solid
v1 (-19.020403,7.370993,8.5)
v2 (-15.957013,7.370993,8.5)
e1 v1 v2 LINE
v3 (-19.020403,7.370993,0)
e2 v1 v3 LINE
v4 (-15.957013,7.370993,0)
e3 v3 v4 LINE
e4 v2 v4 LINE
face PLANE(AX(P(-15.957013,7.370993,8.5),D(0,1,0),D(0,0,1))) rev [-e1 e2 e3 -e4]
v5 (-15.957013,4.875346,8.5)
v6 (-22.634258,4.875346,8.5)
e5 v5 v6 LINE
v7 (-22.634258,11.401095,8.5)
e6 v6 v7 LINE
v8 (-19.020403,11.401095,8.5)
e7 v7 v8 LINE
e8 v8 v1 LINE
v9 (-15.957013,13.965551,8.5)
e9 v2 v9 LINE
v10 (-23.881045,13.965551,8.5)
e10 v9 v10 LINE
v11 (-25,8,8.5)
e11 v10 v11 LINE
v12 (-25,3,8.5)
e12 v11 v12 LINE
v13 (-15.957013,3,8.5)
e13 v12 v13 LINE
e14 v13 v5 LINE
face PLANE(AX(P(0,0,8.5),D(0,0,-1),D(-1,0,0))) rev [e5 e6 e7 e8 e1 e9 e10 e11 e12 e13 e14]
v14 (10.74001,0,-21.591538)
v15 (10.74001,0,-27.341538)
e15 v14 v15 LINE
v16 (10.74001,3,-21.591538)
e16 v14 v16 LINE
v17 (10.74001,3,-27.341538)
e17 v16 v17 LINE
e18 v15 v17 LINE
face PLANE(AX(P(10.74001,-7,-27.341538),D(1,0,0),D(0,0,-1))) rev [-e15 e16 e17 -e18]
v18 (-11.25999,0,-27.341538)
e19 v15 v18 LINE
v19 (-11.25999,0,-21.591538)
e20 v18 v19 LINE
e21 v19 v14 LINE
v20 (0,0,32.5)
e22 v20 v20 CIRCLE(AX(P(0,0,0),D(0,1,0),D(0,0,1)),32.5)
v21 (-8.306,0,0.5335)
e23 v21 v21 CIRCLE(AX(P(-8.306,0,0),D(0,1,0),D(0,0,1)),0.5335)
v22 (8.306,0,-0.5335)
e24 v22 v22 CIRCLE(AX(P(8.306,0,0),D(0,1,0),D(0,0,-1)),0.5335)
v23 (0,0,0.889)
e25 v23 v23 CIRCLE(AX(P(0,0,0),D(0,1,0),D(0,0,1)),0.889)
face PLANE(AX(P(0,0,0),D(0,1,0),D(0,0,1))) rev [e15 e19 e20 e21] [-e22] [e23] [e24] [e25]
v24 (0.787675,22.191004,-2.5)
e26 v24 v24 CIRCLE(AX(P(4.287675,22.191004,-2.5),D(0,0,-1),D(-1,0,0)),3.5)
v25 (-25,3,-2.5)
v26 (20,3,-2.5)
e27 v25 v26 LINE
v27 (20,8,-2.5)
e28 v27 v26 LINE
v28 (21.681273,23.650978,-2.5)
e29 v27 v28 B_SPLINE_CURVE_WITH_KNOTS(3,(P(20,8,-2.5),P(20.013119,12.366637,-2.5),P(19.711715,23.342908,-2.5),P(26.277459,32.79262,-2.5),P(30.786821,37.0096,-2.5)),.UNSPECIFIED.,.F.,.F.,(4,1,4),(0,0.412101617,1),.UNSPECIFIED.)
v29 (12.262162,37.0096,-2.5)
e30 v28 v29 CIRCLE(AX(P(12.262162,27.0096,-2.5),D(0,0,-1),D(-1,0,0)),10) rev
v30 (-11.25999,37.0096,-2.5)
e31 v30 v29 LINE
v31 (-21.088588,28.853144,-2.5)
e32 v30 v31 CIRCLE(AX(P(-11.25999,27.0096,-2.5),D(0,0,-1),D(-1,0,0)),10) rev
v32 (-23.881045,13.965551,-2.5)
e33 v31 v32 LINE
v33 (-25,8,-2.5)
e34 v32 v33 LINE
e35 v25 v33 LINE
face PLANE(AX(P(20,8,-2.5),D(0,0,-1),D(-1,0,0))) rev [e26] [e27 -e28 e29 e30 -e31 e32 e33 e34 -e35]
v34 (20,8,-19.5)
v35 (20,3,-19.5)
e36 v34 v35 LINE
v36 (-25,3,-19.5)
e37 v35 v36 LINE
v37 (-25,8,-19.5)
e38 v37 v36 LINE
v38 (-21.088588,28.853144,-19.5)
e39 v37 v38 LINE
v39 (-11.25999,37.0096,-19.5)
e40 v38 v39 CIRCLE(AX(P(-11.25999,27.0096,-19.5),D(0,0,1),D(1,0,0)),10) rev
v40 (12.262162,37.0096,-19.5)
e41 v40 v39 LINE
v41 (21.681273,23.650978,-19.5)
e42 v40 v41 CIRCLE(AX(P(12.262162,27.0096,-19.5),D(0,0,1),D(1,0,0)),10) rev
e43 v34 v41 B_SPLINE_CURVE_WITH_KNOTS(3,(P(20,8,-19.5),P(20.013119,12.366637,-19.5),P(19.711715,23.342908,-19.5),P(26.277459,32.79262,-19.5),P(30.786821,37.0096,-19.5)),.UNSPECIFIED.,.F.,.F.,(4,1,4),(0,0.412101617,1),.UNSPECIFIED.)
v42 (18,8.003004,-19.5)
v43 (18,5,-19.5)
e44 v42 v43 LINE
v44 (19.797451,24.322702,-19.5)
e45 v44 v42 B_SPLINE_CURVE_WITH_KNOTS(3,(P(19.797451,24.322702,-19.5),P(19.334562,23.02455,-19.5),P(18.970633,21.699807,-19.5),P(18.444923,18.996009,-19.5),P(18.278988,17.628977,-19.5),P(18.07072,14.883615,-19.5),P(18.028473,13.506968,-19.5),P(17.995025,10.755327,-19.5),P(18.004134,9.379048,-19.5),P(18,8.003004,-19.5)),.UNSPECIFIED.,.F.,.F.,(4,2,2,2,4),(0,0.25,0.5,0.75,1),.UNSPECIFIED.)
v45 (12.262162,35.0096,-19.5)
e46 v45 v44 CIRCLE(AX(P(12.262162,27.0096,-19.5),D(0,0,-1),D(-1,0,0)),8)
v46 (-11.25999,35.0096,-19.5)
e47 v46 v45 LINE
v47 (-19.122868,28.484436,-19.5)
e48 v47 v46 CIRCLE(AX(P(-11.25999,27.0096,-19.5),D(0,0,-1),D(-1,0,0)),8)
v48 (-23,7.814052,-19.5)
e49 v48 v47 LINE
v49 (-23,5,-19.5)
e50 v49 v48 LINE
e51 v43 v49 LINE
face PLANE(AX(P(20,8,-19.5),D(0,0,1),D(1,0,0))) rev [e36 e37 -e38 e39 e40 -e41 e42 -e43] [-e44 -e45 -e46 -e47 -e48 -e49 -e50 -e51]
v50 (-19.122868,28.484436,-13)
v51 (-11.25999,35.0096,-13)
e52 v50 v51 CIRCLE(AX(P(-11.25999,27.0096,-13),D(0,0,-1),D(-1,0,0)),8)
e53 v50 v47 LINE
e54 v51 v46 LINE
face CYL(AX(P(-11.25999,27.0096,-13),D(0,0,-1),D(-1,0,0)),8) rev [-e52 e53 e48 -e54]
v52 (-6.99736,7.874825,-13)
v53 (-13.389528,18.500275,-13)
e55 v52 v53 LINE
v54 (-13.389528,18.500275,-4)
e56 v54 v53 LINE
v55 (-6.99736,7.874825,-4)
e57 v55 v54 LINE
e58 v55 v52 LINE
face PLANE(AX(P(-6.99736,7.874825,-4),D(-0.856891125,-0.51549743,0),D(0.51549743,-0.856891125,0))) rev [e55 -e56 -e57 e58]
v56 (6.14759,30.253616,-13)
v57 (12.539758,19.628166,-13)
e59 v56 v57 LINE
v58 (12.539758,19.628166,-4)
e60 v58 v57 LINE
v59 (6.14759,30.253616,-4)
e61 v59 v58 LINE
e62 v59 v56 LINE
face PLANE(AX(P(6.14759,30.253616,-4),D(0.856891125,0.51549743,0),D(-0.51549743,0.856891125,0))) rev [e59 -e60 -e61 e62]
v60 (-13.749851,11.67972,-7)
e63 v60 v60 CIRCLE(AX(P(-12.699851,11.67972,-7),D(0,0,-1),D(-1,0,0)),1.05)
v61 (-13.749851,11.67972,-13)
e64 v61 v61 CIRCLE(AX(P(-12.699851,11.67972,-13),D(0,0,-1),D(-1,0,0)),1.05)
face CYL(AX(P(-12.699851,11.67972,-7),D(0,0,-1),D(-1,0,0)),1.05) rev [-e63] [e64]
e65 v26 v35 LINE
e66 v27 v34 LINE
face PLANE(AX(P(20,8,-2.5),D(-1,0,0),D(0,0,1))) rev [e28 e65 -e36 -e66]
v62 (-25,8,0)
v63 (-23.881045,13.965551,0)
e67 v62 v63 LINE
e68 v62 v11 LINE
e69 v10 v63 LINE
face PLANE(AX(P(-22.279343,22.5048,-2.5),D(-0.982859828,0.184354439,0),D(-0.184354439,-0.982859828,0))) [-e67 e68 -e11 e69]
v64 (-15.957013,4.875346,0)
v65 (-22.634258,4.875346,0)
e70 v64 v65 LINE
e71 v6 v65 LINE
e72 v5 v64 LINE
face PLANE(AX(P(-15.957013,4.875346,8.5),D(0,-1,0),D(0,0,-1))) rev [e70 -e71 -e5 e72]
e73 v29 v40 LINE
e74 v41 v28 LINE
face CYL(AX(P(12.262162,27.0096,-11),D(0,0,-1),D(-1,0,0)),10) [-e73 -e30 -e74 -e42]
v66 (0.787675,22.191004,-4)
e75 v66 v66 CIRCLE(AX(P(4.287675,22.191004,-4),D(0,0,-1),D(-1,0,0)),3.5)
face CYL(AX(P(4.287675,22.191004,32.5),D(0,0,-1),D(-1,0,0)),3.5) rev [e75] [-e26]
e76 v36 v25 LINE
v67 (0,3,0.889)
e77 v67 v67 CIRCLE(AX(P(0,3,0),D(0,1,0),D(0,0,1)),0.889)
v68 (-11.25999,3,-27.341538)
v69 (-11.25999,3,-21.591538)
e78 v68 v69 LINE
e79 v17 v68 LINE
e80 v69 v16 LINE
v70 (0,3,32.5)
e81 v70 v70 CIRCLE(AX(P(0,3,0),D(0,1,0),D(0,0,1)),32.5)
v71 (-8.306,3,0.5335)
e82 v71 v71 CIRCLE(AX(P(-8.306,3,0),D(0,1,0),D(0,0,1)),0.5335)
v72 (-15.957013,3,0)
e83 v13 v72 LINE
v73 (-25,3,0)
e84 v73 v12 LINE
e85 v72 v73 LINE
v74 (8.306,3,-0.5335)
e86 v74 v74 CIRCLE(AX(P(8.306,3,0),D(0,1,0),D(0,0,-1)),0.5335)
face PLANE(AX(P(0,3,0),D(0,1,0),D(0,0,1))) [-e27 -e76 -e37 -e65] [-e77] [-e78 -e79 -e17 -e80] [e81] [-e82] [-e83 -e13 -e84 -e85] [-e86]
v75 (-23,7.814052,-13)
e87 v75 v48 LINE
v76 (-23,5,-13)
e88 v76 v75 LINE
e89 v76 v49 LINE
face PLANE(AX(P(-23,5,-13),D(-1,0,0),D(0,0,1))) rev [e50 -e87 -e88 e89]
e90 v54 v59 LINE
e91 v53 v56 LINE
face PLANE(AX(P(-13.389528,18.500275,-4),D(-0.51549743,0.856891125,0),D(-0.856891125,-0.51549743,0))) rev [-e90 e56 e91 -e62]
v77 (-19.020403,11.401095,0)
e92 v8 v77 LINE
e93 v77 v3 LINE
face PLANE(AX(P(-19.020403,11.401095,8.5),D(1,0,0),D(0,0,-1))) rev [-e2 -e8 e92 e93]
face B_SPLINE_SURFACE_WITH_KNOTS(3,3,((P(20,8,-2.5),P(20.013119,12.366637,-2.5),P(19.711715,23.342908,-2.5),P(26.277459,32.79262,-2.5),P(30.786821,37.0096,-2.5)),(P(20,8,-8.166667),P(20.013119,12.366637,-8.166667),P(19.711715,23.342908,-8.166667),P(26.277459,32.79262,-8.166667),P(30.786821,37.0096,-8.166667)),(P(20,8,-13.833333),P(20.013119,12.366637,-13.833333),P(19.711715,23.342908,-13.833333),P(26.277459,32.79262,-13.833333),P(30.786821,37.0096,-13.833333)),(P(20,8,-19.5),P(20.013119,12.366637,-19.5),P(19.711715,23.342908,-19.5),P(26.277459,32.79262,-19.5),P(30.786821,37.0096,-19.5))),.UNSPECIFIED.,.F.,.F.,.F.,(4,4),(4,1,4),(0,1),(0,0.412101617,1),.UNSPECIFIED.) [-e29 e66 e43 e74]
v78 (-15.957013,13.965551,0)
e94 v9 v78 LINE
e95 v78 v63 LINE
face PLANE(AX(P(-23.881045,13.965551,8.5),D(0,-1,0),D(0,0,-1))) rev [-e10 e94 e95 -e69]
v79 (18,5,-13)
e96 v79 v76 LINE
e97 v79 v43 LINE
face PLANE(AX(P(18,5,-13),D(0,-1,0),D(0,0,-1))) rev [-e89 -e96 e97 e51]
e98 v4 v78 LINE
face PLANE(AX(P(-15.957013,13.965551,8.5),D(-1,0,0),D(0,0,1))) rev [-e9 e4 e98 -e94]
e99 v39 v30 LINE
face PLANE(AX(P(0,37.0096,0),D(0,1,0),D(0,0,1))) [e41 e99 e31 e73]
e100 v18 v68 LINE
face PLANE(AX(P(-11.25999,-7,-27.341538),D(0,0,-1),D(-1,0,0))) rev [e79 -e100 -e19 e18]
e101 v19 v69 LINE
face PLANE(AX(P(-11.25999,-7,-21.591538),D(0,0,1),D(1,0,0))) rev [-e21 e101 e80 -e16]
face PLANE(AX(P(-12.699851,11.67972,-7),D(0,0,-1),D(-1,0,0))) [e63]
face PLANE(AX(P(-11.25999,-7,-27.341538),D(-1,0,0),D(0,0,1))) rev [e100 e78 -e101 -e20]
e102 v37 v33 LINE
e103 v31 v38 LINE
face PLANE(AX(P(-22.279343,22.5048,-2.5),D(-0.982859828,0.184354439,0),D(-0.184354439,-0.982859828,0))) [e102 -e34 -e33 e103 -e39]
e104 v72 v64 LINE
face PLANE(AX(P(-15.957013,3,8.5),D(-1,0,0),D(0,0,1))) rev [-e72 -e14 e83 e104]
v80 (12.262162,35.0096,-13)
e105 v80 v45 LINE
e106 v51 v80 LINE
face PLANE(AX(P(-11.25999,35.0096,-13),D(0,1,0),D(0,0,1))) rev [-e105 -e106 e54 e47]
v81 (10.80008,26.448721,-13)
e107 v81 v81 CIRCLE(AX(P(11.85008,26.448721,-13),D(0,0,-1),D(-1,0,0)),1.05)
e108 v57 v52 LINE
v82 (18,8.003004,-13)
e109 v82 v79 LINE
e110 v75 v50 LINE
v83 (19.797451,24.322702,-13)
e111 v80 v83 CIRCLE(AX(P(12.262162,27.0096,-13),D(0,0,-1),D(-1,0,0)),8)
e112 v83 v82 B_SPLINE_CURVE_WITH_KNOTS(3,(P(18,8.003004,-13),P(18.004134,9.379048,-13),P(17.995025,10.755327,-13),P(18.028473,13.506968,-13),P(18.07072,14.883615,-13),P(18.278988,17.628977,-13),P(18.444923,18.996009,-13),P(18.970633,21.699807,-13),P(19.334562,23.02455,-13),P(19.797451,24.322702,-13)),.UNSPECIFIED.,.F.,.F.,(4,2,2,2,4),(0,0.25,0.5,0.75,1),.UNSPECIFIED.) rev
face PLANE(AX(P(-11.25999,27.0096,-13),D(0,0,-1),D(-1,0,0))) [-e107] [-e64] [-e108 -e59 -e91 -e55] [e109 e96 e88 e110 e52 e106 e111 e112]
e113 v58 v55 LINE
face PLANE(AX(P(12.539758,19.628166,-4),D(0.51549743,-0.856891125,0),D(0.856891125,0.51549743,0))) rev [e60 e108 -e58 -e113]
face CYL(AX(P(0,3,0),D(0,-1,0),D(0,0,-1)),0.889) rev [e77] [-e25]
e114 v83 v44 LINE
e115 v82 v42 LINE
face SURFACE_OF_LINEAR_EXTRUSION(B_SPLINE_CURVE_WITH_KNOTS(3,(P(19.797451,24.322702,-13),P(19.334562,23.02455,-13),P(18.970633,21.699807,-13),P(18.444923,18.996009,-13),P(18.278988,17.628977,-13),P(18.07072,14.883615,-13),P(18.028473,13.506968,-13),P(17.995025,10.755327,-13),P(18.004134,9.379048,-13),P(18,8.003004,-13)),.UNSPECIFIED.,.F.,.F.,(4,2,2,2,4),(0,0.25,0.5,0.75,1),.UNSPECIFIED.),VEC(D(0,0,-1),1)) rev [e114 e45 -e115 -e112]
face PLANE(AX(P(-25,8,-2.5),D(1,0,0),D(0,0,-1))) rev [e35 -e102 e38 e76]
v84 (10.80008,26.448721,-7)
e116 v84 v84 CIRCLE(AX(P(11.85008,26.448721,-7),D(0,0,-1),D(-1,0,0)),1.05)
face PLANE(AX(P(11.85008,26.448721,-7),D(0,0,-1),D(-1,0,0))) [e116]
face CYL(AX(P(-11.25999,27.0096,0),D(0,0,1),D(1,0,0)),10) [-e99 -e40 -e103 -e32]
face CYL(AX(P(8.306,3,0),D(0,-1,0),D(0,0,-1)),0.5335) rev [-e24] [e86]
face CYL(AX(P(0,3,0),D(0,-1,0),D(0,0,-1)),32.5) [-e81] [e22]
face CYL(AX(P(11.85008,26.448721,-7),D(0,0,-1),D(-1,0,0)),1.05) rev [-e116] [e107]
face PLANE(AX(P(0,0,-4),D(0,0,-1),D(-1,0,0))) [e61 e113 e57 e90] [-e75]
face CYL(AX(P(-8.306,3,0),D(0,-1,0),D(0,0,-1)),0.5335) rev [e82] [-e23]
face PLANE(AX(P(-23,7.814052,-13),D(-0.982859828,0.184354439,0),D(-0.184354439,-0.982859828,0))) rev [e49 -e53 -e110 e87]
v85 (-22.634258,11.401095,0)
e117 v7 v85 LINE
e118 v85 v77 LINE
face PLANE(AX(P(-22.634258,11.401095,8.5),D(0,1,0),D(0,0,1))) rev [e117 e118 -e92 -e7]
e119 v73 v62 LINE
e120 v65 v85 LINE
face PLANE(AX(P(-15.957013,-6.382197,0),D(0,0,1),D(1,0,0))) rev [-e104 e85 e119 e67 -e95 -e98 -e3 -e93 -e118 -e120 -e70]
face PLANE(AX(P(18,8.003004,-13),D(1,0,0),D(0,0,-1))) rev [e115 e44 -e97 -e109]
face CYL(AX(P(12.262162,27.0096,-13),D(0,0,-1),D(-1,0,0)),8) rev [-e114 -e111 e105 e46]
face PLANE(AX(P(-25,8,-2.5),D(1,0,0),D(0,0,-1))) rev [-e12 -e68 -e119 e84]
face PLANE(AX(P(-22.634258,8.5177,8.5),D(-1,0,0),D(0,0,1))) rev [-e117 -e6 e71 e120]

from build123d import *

# Parameters (mm, degrees)
SKETCH1_R           = 32.5
SKETCH1_R_2         = 0.889
SKETCH1_R_3         = 0.5335
BOSS_EXTRUDE1_DEPTH = 3
SKETCH2_W           = 45
SKETCH2_H           = 17
BOSS_EXTRUDE2_DEPTH = 5
LOFT1_START         = -19.5
LOFT1_DEPTH         = 17
FILLET2_R           = 10
CUT_EXTRUDE7_DEPTH  = 6.5
CUT_EXTRUDE8_DEPTH  = 9
SKETCH59_R          = 1.05
CUT_EXTRUDE9_DEPTH  = 6
SKETCH60_R          = 3.5
CUT_EXTRUDE10_DEPTH = 62.304245363
BOSS_EXTRUDE3_DEPTH = 11
CUT_EXTRUDE11_REACH = 53.415
SKETCH62_W          = 9.042987319
SKETCH62_H          = 2.5
SKETCH63_W          = 22
SKETCH63_H          = 5.75
CUT_EXTRUDE12_DEPTH = 10


# Read off the part's stored shape, not the designer's step: Loft1
with BuildPart() as part:
    # Sketch1 → Boss-Extrude1 (new body)
    with BuildSketch(Plane(origin=(0, 0, 0), x_dir=(1, 0, 0), z_dir=(0, 1, 0))):
        with Locations(Location((0, 0, 0), (0, 0, 270))):
            Circle(SKETCH1_R)
        with Locations(Location((0, 0, 0), (0, 0, 270))):
            Circle(SKETCH1_R_2, mode=Mode.SUBTRACT)
        with Locations(Location((-8.306, 0, 0), (0, 0, 270))):
            Circle(SKETCH1_R_3, mode=Mode.SUBTRACT)
        with Locations(Location((8.306, 0, 0), (0, 0, 90))):
            Circle(SKETCH1_R_3, mode=Mode.SUBTRACT)
    extrude(amount=BOSS_EXTRUDE1_DEPTH)

    # Sketch2 → Boss-Extrude2 (add)
    with BuildSketch(Plane(origin=(0, 3, 0), x_dir=(1, 0, 0), z_dir=(0, 1, 0))):
        with Locations((-2.5, 11)):
            Rectangle(SKETCH2_W, SKETCH2_H)
    extrude(amount=BOSS_EXTRUDE2_DEPTH)

    # Loft1 outline → Loft1 (add)
    with BuildSketch(Plane.XY.offset(LOFT1_START)):
        with BuildLine():
            Line((-25, 8), (20, 8))
            add(Edge.make_bspline(
                [(20, 8), (20.013119001, 12.366637273), (19.711715011, 23.342908392), (26.277458631, 32.792620463), (30.786821215, 37.0096)],
                knots=[0, 0, 0, 0, 0.412101617, 1, 1, 1, 1], degree=3))
            Line((30.786821215, 37.0096), (-19.558686419, 37.0096))
            Line((-19.558686419, 37.0096), (-25, 8))
        make_face()
    extrude(amount=LOFT1_DEPTH)

    # Fillet2
    fillet2_edges = [part.edges().sort_by_distance(p)[0] for p in [
        (30.786821215, 37.0096, -11),
        (-19.558686419, 37.0096, -11),
    ]]
    fillet(fillet2_edges, radius=FILLET2_R)

    # Sketch56 → Cut-Extrude7 (cut)
    with BuildSketch(Plane(origin=(0, 0, -19.5), x_dir=(-1, 0, 0), z_dir=(0, 0, -1))):
        with BuildLine():
            Line((11.259989716, 35.0096), (-12.262162003, 35.0096))
            ThreePointArc((-12.262162003, 35.0096), (-18.800326154, 31.619633572), (-19.797451062, 24.322702384))
            add(Edge.make_bspline(
                [(-19.797451062, 24.322702384), (-19.33456189, 23.024549565), (-18.970633179, 21.699807372), (-18.444923303, 18.9960086), (-18.278988003, 17.628977113), (-18.070720499, 14.883614823), (-18.028473243, 13.506968306), (-17.995025378, 10.755326884), (-18.004134147, 9.379048249), (-18, 8.003004365)],
                knots=[0, 0, 0, 0, 0.25, 0.25, 0.5, 0.5, 0.75, 0.75, 1, 1, 1, 1], degree=3))
            Line((-18, 8.003004365), (-18, 5))
            Line((-18, 5), (23, 5))
            Line((23, 5), (23, 7.814051971))
            Line((23, 7.814051971), (19.122868337, 28.484435511))
            ThreePointArc((19.122868337, 28.484435511), (16.368870019, 33.165844151), (11.259989716, 35.0096))
        make_face()
    extrude(amount=-CUT_EXTRUDE7_DEPTH, mode=Mode.SUBTRACT)

    # Sketch57 → Cut-Extrude8 (cut)
    with BuildSketch(Plane(origin=(0, 0, -13), x_dir=(-1, 0, 0), z_dir=(0, 0, -1))):
        Polygon((-6.147589592, 30.253616288), (-12.539757722, 19.62816634), (6.997359924, 7.874824939), (13.389528054, 18.500274887), align=None)
    extrude(amount=-CUT_EXTRUDE8_DEPTH, mode=Mode.SUBTRACT)

    # Sketch59 → Cut-Extrude9 (cut)
    with BuildSketch(Plane(origin=(0, 0, -13), x_dir=(-1, 0, 0), z_dir=(0, 0, -1))):
        with Locations((-11.850080197, 26.448721296)):
            Circle(SKETCH59_R)
        with Locations((12.699850529, 11.679719931)):
            Circle(SKETCH59_R)
    extrude(amount=-CUT_EXTRUDE9_DEPTH, mode=Mode.SUBTRACT)

    # Sketch60 → Cut-Extrude10 (cut, through all)
    with BuildSketch(Plane(origin=(0, 0, -4), x_dir=(-1, 0, 0), z_dir=(0, 0, -1))):
        with Locations((-4.287675332, 22.191003874)):
            Circle(SKETCH60_R)
    extrude(amount=-CUT_EXTRUDE10_DEPTH, mode=Mode.SUBTRACT)

    # Sketch61 → Boss-Extrude3 (add)
    with BuildSketch(Plane.XY.offset(-2.5)):
        Polygon((-25, 3), (-15.957012681, 3), (-15.957012681, 4.875346451), (-22.634257591, 4.875346451), (-22.634257591, 8.517700202), (-22.634257591, 11.401095106), (-19.020402646, 11.401095106), (-19.020402646, 7.370992949), (-15.957012681, 7.370992949), (-15.957012681, 13.965550524), (-23.881045203, 13.965550524), (-25, 8), align=None)
    extrude(amount=BOSS_EXTRUDE3_DEPTH)

    # Cut-Extrude11: up to this face of the body (flat: up to its plane)
    cut_extrude11_end = Plane(part.part.faces().sort_by_distance((1.612350985, 3, 3.31348115))[0])
    # Sketch62 → Cut-Extrude11 (cut, up to the picked face)
    with BuildSketch(Plane(origin=(0, 13.965550524, 0), x_dir=(1, 0, 0), z_dir=(0, 1, 0)), mode=Mode.PRIVATE) as cut_extrude11_sk1:
        with Locations((-20.478506341, 1.25)):
            Rectangle(SKETCH62_W, SKETCH62_H)
    cut_extrude11_tool1 = split(extrude(cut_extrude11_sk1.sketch, amount=-CUT_EXTRUDE11_REACH, mode=Mode.PRIVATE), bisect_by=cut_extrude11_end, keep=Keep.BOTH, mode=Mode.PRIVATE)
    add(cut_extrude11_tool1.solids().sort_by(Axis((-20.478506, 13.965551, -1.25), (0, -1, 0)))[0], mode=Mode.SUBTRACT)

    # Sketch63 → Cut-Extrude12 (cut)
    with BuildSketch(Plane(origin=(0, 3, 0), x_dir=(1, 0, 0), z_dir=(0, 1, 0))):
        with Locations((-0.259989716, 24.466538137)):
            Rectangle(SKETCH63_W, SKETCH63_H)
    extrude(amount=-CUT_EXTRUDE12_DEPTH, mode=Mode.SUBTRACT)


solid = part.part
